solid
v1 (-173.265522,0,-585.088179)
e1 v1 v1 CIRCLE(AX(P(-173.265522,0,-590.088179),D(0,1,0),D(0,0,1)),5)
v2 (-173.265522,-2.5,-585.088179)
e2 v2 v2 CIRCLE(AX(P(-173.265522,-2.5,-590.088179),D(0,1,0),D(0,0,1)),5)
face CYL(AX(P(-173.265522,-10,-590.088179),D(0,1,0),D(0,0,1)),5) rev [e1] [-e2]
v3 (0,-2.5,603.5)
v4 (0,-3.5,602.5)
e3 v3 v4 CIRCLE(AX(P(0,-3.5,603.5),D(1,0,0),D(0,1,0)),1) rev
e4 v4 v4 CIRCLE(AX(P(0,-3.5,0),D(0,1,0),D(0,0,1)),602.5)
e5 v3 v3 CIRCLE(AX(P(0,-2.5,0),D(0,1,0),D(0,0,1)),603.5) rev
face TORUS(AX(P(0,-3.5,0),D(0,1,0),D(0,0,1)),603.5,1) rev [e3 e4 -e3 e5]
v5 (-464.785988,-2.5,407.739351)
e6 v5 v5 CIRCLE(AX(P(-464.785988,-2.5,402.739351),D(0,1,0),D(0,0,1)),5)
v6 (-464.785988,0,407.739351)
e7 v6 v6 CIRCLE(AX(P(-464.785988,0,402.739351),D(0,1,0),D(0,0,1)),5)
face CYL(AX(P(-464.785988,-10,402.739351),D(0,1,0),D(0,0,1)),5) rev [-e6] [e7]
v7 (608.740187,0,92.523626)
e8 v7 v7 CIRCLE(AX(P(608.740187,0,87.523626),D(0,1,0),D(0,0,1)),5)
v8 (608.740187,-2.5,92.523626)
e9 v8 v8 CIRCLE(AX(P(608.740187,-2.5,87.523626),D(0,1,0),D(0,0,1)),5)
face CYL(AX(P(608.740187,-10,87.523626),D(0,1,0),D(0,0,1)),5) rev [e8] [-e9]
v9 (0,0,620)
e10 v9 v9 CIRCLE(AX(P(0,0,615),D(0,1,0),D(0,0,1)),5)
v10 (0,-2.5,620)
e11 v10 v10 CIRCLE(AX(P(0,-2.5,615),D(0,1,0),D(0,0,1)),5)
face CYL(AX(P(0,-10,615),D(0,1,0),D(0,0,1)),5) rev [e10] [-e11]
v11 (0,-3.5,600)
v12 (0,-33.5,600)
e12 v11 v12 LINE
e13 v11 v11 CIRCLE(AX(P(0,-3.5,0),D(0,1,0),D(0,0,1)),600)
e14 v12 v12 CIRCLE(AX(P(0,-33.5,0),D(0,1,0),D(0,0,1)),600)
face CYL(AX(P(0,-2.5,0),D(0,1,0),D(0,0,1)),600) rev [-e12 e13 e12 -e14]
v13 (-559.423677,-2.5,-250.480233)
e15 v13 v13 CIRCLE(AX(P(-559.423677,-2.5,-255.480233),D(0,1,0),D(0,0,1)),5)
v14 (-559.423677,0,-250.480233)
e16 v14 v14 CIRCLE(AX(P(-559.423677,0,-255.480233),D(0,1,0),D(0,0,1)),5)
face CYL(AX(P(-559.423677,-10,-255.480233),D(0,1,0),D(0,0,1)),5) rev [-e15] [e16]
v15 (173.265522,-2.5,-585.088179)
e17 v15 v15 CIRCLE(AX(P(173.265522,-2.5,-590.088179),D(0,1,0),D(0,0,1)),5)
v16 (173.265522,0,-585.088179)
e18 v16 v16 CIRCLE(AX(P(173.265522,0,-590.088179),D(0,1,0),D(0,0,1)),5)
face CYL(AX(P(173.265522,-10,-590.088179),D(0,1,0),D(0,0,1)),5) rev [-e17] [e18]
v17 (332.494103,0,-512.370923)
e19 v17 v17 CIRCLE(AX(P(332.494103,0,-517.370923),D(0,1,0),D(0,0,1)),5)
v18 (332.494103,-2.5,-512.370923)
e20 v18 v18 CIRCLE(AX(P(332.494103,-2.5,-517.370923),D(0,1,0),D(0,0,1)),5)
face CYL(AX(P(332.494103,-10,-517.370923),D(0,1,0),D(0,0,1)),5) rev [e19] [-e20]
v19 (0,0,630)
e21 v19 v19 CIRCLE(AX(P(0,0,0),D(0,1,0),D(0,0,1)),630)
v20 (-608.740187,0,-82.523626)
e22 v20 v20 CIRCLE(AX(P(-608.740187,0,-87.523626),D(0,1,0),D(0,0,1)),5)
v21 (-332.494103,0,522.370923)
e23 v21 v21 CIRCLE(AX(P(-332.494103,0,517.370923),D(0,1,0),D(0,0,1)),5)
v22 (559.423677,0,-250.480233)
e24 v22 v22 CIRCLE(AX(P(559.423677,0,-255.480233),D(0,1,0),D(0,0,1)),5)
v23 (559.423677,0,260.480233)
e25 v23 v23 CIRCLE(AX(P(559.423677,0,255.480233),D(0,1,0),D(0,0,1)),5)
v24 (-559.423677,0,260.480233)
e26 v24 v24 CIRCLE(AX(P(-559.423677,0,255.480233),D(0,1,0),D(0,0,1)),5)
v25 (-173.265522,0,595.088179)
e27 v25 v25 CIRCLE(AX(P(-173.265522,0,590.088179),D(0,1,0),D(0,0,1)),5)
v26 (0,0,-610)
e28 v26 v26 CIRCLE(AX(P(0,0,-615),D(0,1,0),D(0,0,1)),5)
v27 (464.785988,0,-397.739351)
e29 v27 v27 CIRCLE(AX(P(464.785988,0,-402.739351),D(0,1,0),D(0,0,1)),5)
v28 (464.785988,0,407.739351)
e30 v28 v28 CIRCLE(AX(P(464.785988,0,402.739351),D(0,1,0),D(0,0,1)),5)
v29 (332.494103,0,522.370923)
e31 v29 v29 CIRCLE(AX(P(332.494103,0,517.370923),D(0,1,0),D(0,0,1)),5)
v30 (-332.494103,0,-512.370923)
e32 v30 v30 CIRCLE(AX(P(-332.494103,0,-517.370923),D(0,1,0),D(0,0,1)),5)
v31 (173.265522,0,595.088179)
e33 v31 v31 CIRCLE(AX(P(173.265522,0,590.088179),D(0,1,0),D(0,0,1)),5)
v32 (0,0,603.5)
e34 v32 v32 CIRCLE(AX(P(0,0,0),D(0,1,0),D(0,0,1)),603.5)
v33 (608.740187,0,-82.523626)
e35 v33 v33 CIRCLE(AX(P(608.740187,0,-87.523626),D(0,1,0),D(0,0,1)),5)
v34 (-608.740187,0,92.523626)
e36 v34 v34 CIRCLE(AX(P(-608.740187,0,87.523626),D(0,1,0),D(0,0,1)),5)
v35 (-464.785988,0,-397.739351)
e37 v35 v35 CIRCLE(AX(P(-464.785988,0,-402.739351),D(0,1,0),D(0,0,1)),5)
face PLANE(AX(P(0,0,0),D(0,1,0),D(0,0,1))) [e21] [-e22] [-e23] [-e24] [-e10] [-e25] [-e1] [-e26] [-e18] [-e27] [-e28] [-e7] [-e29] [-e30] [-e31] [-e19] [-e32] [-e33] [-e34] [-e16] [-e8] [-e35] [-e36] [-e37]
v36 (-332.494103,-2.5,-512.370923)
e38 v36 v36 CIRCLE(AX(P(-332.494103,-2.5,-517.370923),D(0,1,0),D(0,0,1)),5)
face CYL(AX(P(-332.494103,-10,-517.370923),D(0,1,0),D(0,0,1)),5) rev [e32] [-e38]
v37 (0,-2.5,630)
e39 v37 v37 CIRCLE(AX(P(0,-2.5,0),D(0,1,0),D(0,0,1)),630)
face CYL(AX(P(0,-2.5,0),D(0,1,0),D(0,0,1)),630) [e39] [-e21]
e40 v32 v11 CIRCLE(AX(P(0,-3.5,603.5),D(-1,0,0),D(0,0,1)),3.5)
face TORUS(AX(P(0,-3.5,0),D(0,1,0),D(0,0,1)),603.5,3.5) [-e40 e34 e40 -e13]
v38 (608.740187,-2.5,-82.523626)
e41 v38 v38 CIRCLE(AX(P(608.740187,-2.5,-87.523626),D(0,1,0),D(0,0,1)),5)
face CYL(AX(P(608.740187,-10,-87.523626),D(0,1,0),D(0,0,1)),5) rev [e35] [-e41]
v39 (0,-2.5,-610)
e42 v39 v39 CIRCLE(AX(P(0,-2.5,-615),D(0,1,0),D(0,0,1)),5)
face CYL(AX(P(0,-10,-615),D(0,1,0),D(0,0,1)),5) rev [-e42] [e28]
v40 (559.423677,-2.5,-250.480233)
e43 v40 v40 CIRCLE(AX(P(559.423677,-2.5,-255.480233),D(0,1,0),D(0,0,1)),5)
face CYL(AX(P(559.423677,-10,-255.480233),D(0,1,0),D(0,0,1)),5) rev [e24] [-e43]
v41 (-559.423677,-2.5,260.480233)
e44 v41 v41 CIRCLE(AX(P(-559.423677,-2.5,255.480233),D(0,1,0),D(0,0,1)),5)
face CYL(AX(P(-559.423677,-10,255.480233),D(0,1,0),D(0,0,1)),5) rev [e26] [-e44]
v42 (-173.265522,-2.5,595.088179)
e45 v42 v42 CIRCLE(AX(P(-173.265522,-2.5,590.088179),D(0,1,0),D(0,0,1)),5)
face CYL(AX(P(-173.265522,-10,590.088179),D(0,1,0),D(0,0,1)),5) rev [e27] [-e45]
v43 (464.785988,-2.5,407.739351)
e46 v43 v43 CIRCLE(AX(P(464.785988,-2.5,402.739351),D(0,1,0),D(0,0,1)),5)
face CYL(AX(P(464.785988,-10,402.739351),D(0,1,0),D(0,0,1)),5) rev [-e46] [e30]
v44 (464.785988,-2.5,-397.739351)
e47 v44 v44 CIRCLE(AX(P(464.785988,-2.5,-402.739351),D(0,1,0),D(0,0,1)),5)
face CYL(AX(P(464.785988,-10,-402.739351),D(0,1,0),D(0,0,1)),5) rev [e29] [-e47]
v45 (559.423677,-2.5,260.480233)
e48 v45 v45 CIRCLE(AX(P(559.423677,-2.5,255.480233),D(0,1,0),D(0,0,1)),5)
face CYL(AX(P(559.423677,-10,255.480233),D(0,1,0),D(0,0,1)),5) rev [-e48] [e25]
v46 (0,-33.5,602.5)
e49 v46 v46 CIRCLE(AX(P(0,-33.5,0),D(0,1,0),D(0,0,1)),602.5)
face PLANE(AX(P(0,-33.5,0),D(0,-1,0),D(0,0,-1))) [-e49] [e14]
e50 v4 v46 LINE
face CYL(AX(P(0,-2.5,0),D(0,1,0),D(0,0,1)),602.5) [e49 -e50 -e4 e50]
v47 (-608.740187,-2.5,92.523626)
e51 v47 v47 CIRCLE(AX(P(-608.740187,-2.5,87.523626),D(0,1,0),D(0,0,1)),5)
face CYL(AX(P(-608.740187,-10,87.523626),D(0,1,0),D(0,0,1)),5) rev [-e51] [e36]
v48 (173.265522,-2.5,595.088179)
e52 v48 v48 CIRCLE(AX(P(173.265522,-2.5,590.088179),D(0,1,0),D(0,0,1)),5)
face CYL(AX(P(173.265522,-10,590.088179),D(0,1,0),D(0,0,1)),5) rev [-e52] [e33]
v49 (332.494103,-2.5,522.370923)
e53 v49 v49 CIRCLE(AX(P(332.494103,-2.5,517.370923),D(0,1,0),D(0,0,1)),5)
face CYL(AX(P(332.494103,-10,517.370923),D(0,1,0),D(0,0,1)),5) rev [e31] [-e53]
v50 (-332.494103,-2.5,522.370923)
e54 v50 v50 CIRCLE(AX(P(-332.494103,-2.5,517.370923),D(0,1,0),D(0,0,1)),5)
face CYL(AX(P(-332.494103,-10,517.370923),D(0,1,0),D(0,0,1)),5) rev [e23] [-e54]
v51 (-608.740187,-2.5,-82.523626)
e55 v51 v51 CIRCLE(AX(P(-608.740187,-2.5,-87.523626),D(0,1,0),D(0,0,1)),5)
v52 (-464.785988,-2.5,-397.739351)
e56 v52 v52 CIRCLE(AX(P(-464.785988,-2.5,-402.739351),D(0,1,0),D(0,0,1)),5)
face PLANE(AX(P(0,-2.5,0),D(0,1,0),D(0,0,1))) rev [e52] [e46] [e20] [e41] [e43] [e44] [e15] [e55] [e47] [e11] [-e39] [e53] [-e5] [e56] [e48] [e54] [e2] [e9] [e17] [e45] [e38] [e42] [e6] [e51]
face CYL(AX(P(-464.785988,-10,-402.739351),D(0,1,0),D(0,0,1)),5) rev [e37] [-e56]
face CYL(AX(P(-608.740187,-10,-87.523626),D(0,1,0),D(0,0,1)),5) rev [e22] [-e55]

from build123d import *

# Parameters (mm, degrees)
SKETCH1_R          = 630
SKETCH1_R_2        = 600
BASE_FLANGE1_DEPTH = 2.5
SKETCH8_R          = 5
CUT_EXTRUDE1_DEPTH = 10


# Read off the part's stored shape, not the designer's step: Edge-Flange1
# Sheet-metal steps are written as plain solids
with BuildPart() as part:
    # Sketch1 → Base-Flange1 (new body)
    with BuildSketch(Plane(origin=(0, 0, 0), x_dir=(1, 0, 0), z_dir=(0, 1, 0))):
        with Locations(Location((0, 0, 0), (0, 0, 270))):
            Circle(SKETCH1_R)
        with Locations(Location((0, 0, 0), (0, 0, 270))):
            Circle(SKETCH1_R_2, mode=Mode.SUBTRACT)
    extrude(amount=-BASE_FLANGE1_DEPTH)

    # Edge-Flange1 outline → Edge-Flange1 (revolve, cut)
    with BuildSketch(Plane.XY):
        with BuildLine():
            Line((600, -2.5), (600.145898034, -2.5))
            ThreePointArc((600.145898034, -2.5), (601.408349934, -0.69375696), (603.5, 0))
            Line((603.5, 0), (600, 0))
            Line((600, 0), (600, -2.5))
        make_face()
    revolve(axis=Axis((0, 0, 0), (0, 1, 0)), mode=Mode.SUBTRACT)

    # Edge-Flange1 2 outline → Edge-Flange1 2 (revolve)
    with BuildSketch(Plane.XY):
        with BuildLine():
            Line((600, -3.5), (600, -33.5))
            Line((600, -33.5), (602.5, -33.5))
            Line((602.5, -33.5), (602.5, -3.5))
            ThreePointArc((602.5, -3.5), (602.792893219, -2.792893219), (603.5, -2.5))
            Line((603.5, -2.5), (600.145898034, -2.5))
            ThreePointArc((600.145898034, -2.5), (600.036666571, -2.994706462), (600, -3.5))
        make_face()
    revolve(axis=Axis((0, 0, 0), (0, 1, 0)))

    # Sketch8 → Cut-Extrude1 (cut)
    with BuildSketch(Plane(origin=(0, 0, 0), x_dir=(1, 0, 0), z_dir=(0, 1, 0))):
        with Locations(Location((173.265522457, 590.088178773, 0), (0, 0, 270))):
            Circle(SKETCH8_R)
        with Locations(Location((332.494102735, 517.370922691, 0), (0, 0, 270))):
            Circle(SKETCH8_R)
        with Locations(Location((0, 615, 0), (0, 0, 270))):
            Circle(SKETCH8_R)
        with Locations(Location((464.785988228, 402.739351376, 0), (0, 0, 270))):
            Circle(SKETCH8_R)
        with Locations(Location((559.423677143, 255.480232996, 0), (0, 0, 270))):
            Circle(SKETCH8_R)
        with Locations(Location((608.740186757, 87.523625538, 0), (0, 0, 270))):
            Circle(SKETCH8_R)
        with Locations(Location((608.740186757, -87.523625538, 0), (0, 0, 270))):
            Circle(SKETCH8_R)
        with Locations(Location((559.423677143, -255.480232996, 0), (0, 0, 270))):
            Circle(SKETCH8_R)
        with Locations(Location((464.785988228, -402.739351376, 0), (0, 0, 270))):
            Circle(SKETCH8_R)
        with Locations(Location((332.494102735, -517.370922691, 0), (0, 0, 270))):
            Circle(SKETCH8_R)
        with Locations(Location((173.265522458, -590.088178773, 0), (0, 0, 270))):
            Circle(SKETCH8_R)
        with Locations(Location((0, -615, 0), (0, 0, 270))):
            Circle(SKETCH8_R)
        with Locations(Location((-173.265522457, -590.088178773, 0), (0, 0, 270))):
            Circle(SKETCH8_R)
        with Locations(Location((-332.494102735, -517.370922691, 0), (0, 0, 270))):
            Circle(SKETCH8_R)
        with Locations(Location((-464.785988228, -402.739351376, 0), (0, 0, 270))):
            Circle(SKETCH8_R)
        with Locations(Location((-559.423677143, -255.480232996, 0), (0, 0, 270))):
            Circle(SKETCH8_R)
        with Locations(Location((-608.740186757, -87.523625538, 0), (0, 0, 270))):
            Circle(SKETCH8_R)
        with Locations(Location((-608.740186757, 87.523625538, 0), (0, 0, 270))):
            Circle(SKETCH8_R)
        with Locations(Location((-559.423677143, 255.480232996, 0), (0, 0, 270))):
            Circle(SKETCH8_R)
        with Locations(Location((-464.785988228, 402.739351376, 0), (0, 0, 270))):
            Circle(SKETCH8_R)
        with Locations(Location((-332.494102735, 517.370922691, 0), (0, 0, 270))):
            Circle(SKETCH8_R)
        with Locations(Location((-173.265522457, 590.088178773, 0), (0, 0, 270))):
            Circle(SKETCH8_R)
    extrude(amount=-CUT_EXTRUDE1_DEPTH, mode=Mode.SUBTRACT)


solid = part.part
